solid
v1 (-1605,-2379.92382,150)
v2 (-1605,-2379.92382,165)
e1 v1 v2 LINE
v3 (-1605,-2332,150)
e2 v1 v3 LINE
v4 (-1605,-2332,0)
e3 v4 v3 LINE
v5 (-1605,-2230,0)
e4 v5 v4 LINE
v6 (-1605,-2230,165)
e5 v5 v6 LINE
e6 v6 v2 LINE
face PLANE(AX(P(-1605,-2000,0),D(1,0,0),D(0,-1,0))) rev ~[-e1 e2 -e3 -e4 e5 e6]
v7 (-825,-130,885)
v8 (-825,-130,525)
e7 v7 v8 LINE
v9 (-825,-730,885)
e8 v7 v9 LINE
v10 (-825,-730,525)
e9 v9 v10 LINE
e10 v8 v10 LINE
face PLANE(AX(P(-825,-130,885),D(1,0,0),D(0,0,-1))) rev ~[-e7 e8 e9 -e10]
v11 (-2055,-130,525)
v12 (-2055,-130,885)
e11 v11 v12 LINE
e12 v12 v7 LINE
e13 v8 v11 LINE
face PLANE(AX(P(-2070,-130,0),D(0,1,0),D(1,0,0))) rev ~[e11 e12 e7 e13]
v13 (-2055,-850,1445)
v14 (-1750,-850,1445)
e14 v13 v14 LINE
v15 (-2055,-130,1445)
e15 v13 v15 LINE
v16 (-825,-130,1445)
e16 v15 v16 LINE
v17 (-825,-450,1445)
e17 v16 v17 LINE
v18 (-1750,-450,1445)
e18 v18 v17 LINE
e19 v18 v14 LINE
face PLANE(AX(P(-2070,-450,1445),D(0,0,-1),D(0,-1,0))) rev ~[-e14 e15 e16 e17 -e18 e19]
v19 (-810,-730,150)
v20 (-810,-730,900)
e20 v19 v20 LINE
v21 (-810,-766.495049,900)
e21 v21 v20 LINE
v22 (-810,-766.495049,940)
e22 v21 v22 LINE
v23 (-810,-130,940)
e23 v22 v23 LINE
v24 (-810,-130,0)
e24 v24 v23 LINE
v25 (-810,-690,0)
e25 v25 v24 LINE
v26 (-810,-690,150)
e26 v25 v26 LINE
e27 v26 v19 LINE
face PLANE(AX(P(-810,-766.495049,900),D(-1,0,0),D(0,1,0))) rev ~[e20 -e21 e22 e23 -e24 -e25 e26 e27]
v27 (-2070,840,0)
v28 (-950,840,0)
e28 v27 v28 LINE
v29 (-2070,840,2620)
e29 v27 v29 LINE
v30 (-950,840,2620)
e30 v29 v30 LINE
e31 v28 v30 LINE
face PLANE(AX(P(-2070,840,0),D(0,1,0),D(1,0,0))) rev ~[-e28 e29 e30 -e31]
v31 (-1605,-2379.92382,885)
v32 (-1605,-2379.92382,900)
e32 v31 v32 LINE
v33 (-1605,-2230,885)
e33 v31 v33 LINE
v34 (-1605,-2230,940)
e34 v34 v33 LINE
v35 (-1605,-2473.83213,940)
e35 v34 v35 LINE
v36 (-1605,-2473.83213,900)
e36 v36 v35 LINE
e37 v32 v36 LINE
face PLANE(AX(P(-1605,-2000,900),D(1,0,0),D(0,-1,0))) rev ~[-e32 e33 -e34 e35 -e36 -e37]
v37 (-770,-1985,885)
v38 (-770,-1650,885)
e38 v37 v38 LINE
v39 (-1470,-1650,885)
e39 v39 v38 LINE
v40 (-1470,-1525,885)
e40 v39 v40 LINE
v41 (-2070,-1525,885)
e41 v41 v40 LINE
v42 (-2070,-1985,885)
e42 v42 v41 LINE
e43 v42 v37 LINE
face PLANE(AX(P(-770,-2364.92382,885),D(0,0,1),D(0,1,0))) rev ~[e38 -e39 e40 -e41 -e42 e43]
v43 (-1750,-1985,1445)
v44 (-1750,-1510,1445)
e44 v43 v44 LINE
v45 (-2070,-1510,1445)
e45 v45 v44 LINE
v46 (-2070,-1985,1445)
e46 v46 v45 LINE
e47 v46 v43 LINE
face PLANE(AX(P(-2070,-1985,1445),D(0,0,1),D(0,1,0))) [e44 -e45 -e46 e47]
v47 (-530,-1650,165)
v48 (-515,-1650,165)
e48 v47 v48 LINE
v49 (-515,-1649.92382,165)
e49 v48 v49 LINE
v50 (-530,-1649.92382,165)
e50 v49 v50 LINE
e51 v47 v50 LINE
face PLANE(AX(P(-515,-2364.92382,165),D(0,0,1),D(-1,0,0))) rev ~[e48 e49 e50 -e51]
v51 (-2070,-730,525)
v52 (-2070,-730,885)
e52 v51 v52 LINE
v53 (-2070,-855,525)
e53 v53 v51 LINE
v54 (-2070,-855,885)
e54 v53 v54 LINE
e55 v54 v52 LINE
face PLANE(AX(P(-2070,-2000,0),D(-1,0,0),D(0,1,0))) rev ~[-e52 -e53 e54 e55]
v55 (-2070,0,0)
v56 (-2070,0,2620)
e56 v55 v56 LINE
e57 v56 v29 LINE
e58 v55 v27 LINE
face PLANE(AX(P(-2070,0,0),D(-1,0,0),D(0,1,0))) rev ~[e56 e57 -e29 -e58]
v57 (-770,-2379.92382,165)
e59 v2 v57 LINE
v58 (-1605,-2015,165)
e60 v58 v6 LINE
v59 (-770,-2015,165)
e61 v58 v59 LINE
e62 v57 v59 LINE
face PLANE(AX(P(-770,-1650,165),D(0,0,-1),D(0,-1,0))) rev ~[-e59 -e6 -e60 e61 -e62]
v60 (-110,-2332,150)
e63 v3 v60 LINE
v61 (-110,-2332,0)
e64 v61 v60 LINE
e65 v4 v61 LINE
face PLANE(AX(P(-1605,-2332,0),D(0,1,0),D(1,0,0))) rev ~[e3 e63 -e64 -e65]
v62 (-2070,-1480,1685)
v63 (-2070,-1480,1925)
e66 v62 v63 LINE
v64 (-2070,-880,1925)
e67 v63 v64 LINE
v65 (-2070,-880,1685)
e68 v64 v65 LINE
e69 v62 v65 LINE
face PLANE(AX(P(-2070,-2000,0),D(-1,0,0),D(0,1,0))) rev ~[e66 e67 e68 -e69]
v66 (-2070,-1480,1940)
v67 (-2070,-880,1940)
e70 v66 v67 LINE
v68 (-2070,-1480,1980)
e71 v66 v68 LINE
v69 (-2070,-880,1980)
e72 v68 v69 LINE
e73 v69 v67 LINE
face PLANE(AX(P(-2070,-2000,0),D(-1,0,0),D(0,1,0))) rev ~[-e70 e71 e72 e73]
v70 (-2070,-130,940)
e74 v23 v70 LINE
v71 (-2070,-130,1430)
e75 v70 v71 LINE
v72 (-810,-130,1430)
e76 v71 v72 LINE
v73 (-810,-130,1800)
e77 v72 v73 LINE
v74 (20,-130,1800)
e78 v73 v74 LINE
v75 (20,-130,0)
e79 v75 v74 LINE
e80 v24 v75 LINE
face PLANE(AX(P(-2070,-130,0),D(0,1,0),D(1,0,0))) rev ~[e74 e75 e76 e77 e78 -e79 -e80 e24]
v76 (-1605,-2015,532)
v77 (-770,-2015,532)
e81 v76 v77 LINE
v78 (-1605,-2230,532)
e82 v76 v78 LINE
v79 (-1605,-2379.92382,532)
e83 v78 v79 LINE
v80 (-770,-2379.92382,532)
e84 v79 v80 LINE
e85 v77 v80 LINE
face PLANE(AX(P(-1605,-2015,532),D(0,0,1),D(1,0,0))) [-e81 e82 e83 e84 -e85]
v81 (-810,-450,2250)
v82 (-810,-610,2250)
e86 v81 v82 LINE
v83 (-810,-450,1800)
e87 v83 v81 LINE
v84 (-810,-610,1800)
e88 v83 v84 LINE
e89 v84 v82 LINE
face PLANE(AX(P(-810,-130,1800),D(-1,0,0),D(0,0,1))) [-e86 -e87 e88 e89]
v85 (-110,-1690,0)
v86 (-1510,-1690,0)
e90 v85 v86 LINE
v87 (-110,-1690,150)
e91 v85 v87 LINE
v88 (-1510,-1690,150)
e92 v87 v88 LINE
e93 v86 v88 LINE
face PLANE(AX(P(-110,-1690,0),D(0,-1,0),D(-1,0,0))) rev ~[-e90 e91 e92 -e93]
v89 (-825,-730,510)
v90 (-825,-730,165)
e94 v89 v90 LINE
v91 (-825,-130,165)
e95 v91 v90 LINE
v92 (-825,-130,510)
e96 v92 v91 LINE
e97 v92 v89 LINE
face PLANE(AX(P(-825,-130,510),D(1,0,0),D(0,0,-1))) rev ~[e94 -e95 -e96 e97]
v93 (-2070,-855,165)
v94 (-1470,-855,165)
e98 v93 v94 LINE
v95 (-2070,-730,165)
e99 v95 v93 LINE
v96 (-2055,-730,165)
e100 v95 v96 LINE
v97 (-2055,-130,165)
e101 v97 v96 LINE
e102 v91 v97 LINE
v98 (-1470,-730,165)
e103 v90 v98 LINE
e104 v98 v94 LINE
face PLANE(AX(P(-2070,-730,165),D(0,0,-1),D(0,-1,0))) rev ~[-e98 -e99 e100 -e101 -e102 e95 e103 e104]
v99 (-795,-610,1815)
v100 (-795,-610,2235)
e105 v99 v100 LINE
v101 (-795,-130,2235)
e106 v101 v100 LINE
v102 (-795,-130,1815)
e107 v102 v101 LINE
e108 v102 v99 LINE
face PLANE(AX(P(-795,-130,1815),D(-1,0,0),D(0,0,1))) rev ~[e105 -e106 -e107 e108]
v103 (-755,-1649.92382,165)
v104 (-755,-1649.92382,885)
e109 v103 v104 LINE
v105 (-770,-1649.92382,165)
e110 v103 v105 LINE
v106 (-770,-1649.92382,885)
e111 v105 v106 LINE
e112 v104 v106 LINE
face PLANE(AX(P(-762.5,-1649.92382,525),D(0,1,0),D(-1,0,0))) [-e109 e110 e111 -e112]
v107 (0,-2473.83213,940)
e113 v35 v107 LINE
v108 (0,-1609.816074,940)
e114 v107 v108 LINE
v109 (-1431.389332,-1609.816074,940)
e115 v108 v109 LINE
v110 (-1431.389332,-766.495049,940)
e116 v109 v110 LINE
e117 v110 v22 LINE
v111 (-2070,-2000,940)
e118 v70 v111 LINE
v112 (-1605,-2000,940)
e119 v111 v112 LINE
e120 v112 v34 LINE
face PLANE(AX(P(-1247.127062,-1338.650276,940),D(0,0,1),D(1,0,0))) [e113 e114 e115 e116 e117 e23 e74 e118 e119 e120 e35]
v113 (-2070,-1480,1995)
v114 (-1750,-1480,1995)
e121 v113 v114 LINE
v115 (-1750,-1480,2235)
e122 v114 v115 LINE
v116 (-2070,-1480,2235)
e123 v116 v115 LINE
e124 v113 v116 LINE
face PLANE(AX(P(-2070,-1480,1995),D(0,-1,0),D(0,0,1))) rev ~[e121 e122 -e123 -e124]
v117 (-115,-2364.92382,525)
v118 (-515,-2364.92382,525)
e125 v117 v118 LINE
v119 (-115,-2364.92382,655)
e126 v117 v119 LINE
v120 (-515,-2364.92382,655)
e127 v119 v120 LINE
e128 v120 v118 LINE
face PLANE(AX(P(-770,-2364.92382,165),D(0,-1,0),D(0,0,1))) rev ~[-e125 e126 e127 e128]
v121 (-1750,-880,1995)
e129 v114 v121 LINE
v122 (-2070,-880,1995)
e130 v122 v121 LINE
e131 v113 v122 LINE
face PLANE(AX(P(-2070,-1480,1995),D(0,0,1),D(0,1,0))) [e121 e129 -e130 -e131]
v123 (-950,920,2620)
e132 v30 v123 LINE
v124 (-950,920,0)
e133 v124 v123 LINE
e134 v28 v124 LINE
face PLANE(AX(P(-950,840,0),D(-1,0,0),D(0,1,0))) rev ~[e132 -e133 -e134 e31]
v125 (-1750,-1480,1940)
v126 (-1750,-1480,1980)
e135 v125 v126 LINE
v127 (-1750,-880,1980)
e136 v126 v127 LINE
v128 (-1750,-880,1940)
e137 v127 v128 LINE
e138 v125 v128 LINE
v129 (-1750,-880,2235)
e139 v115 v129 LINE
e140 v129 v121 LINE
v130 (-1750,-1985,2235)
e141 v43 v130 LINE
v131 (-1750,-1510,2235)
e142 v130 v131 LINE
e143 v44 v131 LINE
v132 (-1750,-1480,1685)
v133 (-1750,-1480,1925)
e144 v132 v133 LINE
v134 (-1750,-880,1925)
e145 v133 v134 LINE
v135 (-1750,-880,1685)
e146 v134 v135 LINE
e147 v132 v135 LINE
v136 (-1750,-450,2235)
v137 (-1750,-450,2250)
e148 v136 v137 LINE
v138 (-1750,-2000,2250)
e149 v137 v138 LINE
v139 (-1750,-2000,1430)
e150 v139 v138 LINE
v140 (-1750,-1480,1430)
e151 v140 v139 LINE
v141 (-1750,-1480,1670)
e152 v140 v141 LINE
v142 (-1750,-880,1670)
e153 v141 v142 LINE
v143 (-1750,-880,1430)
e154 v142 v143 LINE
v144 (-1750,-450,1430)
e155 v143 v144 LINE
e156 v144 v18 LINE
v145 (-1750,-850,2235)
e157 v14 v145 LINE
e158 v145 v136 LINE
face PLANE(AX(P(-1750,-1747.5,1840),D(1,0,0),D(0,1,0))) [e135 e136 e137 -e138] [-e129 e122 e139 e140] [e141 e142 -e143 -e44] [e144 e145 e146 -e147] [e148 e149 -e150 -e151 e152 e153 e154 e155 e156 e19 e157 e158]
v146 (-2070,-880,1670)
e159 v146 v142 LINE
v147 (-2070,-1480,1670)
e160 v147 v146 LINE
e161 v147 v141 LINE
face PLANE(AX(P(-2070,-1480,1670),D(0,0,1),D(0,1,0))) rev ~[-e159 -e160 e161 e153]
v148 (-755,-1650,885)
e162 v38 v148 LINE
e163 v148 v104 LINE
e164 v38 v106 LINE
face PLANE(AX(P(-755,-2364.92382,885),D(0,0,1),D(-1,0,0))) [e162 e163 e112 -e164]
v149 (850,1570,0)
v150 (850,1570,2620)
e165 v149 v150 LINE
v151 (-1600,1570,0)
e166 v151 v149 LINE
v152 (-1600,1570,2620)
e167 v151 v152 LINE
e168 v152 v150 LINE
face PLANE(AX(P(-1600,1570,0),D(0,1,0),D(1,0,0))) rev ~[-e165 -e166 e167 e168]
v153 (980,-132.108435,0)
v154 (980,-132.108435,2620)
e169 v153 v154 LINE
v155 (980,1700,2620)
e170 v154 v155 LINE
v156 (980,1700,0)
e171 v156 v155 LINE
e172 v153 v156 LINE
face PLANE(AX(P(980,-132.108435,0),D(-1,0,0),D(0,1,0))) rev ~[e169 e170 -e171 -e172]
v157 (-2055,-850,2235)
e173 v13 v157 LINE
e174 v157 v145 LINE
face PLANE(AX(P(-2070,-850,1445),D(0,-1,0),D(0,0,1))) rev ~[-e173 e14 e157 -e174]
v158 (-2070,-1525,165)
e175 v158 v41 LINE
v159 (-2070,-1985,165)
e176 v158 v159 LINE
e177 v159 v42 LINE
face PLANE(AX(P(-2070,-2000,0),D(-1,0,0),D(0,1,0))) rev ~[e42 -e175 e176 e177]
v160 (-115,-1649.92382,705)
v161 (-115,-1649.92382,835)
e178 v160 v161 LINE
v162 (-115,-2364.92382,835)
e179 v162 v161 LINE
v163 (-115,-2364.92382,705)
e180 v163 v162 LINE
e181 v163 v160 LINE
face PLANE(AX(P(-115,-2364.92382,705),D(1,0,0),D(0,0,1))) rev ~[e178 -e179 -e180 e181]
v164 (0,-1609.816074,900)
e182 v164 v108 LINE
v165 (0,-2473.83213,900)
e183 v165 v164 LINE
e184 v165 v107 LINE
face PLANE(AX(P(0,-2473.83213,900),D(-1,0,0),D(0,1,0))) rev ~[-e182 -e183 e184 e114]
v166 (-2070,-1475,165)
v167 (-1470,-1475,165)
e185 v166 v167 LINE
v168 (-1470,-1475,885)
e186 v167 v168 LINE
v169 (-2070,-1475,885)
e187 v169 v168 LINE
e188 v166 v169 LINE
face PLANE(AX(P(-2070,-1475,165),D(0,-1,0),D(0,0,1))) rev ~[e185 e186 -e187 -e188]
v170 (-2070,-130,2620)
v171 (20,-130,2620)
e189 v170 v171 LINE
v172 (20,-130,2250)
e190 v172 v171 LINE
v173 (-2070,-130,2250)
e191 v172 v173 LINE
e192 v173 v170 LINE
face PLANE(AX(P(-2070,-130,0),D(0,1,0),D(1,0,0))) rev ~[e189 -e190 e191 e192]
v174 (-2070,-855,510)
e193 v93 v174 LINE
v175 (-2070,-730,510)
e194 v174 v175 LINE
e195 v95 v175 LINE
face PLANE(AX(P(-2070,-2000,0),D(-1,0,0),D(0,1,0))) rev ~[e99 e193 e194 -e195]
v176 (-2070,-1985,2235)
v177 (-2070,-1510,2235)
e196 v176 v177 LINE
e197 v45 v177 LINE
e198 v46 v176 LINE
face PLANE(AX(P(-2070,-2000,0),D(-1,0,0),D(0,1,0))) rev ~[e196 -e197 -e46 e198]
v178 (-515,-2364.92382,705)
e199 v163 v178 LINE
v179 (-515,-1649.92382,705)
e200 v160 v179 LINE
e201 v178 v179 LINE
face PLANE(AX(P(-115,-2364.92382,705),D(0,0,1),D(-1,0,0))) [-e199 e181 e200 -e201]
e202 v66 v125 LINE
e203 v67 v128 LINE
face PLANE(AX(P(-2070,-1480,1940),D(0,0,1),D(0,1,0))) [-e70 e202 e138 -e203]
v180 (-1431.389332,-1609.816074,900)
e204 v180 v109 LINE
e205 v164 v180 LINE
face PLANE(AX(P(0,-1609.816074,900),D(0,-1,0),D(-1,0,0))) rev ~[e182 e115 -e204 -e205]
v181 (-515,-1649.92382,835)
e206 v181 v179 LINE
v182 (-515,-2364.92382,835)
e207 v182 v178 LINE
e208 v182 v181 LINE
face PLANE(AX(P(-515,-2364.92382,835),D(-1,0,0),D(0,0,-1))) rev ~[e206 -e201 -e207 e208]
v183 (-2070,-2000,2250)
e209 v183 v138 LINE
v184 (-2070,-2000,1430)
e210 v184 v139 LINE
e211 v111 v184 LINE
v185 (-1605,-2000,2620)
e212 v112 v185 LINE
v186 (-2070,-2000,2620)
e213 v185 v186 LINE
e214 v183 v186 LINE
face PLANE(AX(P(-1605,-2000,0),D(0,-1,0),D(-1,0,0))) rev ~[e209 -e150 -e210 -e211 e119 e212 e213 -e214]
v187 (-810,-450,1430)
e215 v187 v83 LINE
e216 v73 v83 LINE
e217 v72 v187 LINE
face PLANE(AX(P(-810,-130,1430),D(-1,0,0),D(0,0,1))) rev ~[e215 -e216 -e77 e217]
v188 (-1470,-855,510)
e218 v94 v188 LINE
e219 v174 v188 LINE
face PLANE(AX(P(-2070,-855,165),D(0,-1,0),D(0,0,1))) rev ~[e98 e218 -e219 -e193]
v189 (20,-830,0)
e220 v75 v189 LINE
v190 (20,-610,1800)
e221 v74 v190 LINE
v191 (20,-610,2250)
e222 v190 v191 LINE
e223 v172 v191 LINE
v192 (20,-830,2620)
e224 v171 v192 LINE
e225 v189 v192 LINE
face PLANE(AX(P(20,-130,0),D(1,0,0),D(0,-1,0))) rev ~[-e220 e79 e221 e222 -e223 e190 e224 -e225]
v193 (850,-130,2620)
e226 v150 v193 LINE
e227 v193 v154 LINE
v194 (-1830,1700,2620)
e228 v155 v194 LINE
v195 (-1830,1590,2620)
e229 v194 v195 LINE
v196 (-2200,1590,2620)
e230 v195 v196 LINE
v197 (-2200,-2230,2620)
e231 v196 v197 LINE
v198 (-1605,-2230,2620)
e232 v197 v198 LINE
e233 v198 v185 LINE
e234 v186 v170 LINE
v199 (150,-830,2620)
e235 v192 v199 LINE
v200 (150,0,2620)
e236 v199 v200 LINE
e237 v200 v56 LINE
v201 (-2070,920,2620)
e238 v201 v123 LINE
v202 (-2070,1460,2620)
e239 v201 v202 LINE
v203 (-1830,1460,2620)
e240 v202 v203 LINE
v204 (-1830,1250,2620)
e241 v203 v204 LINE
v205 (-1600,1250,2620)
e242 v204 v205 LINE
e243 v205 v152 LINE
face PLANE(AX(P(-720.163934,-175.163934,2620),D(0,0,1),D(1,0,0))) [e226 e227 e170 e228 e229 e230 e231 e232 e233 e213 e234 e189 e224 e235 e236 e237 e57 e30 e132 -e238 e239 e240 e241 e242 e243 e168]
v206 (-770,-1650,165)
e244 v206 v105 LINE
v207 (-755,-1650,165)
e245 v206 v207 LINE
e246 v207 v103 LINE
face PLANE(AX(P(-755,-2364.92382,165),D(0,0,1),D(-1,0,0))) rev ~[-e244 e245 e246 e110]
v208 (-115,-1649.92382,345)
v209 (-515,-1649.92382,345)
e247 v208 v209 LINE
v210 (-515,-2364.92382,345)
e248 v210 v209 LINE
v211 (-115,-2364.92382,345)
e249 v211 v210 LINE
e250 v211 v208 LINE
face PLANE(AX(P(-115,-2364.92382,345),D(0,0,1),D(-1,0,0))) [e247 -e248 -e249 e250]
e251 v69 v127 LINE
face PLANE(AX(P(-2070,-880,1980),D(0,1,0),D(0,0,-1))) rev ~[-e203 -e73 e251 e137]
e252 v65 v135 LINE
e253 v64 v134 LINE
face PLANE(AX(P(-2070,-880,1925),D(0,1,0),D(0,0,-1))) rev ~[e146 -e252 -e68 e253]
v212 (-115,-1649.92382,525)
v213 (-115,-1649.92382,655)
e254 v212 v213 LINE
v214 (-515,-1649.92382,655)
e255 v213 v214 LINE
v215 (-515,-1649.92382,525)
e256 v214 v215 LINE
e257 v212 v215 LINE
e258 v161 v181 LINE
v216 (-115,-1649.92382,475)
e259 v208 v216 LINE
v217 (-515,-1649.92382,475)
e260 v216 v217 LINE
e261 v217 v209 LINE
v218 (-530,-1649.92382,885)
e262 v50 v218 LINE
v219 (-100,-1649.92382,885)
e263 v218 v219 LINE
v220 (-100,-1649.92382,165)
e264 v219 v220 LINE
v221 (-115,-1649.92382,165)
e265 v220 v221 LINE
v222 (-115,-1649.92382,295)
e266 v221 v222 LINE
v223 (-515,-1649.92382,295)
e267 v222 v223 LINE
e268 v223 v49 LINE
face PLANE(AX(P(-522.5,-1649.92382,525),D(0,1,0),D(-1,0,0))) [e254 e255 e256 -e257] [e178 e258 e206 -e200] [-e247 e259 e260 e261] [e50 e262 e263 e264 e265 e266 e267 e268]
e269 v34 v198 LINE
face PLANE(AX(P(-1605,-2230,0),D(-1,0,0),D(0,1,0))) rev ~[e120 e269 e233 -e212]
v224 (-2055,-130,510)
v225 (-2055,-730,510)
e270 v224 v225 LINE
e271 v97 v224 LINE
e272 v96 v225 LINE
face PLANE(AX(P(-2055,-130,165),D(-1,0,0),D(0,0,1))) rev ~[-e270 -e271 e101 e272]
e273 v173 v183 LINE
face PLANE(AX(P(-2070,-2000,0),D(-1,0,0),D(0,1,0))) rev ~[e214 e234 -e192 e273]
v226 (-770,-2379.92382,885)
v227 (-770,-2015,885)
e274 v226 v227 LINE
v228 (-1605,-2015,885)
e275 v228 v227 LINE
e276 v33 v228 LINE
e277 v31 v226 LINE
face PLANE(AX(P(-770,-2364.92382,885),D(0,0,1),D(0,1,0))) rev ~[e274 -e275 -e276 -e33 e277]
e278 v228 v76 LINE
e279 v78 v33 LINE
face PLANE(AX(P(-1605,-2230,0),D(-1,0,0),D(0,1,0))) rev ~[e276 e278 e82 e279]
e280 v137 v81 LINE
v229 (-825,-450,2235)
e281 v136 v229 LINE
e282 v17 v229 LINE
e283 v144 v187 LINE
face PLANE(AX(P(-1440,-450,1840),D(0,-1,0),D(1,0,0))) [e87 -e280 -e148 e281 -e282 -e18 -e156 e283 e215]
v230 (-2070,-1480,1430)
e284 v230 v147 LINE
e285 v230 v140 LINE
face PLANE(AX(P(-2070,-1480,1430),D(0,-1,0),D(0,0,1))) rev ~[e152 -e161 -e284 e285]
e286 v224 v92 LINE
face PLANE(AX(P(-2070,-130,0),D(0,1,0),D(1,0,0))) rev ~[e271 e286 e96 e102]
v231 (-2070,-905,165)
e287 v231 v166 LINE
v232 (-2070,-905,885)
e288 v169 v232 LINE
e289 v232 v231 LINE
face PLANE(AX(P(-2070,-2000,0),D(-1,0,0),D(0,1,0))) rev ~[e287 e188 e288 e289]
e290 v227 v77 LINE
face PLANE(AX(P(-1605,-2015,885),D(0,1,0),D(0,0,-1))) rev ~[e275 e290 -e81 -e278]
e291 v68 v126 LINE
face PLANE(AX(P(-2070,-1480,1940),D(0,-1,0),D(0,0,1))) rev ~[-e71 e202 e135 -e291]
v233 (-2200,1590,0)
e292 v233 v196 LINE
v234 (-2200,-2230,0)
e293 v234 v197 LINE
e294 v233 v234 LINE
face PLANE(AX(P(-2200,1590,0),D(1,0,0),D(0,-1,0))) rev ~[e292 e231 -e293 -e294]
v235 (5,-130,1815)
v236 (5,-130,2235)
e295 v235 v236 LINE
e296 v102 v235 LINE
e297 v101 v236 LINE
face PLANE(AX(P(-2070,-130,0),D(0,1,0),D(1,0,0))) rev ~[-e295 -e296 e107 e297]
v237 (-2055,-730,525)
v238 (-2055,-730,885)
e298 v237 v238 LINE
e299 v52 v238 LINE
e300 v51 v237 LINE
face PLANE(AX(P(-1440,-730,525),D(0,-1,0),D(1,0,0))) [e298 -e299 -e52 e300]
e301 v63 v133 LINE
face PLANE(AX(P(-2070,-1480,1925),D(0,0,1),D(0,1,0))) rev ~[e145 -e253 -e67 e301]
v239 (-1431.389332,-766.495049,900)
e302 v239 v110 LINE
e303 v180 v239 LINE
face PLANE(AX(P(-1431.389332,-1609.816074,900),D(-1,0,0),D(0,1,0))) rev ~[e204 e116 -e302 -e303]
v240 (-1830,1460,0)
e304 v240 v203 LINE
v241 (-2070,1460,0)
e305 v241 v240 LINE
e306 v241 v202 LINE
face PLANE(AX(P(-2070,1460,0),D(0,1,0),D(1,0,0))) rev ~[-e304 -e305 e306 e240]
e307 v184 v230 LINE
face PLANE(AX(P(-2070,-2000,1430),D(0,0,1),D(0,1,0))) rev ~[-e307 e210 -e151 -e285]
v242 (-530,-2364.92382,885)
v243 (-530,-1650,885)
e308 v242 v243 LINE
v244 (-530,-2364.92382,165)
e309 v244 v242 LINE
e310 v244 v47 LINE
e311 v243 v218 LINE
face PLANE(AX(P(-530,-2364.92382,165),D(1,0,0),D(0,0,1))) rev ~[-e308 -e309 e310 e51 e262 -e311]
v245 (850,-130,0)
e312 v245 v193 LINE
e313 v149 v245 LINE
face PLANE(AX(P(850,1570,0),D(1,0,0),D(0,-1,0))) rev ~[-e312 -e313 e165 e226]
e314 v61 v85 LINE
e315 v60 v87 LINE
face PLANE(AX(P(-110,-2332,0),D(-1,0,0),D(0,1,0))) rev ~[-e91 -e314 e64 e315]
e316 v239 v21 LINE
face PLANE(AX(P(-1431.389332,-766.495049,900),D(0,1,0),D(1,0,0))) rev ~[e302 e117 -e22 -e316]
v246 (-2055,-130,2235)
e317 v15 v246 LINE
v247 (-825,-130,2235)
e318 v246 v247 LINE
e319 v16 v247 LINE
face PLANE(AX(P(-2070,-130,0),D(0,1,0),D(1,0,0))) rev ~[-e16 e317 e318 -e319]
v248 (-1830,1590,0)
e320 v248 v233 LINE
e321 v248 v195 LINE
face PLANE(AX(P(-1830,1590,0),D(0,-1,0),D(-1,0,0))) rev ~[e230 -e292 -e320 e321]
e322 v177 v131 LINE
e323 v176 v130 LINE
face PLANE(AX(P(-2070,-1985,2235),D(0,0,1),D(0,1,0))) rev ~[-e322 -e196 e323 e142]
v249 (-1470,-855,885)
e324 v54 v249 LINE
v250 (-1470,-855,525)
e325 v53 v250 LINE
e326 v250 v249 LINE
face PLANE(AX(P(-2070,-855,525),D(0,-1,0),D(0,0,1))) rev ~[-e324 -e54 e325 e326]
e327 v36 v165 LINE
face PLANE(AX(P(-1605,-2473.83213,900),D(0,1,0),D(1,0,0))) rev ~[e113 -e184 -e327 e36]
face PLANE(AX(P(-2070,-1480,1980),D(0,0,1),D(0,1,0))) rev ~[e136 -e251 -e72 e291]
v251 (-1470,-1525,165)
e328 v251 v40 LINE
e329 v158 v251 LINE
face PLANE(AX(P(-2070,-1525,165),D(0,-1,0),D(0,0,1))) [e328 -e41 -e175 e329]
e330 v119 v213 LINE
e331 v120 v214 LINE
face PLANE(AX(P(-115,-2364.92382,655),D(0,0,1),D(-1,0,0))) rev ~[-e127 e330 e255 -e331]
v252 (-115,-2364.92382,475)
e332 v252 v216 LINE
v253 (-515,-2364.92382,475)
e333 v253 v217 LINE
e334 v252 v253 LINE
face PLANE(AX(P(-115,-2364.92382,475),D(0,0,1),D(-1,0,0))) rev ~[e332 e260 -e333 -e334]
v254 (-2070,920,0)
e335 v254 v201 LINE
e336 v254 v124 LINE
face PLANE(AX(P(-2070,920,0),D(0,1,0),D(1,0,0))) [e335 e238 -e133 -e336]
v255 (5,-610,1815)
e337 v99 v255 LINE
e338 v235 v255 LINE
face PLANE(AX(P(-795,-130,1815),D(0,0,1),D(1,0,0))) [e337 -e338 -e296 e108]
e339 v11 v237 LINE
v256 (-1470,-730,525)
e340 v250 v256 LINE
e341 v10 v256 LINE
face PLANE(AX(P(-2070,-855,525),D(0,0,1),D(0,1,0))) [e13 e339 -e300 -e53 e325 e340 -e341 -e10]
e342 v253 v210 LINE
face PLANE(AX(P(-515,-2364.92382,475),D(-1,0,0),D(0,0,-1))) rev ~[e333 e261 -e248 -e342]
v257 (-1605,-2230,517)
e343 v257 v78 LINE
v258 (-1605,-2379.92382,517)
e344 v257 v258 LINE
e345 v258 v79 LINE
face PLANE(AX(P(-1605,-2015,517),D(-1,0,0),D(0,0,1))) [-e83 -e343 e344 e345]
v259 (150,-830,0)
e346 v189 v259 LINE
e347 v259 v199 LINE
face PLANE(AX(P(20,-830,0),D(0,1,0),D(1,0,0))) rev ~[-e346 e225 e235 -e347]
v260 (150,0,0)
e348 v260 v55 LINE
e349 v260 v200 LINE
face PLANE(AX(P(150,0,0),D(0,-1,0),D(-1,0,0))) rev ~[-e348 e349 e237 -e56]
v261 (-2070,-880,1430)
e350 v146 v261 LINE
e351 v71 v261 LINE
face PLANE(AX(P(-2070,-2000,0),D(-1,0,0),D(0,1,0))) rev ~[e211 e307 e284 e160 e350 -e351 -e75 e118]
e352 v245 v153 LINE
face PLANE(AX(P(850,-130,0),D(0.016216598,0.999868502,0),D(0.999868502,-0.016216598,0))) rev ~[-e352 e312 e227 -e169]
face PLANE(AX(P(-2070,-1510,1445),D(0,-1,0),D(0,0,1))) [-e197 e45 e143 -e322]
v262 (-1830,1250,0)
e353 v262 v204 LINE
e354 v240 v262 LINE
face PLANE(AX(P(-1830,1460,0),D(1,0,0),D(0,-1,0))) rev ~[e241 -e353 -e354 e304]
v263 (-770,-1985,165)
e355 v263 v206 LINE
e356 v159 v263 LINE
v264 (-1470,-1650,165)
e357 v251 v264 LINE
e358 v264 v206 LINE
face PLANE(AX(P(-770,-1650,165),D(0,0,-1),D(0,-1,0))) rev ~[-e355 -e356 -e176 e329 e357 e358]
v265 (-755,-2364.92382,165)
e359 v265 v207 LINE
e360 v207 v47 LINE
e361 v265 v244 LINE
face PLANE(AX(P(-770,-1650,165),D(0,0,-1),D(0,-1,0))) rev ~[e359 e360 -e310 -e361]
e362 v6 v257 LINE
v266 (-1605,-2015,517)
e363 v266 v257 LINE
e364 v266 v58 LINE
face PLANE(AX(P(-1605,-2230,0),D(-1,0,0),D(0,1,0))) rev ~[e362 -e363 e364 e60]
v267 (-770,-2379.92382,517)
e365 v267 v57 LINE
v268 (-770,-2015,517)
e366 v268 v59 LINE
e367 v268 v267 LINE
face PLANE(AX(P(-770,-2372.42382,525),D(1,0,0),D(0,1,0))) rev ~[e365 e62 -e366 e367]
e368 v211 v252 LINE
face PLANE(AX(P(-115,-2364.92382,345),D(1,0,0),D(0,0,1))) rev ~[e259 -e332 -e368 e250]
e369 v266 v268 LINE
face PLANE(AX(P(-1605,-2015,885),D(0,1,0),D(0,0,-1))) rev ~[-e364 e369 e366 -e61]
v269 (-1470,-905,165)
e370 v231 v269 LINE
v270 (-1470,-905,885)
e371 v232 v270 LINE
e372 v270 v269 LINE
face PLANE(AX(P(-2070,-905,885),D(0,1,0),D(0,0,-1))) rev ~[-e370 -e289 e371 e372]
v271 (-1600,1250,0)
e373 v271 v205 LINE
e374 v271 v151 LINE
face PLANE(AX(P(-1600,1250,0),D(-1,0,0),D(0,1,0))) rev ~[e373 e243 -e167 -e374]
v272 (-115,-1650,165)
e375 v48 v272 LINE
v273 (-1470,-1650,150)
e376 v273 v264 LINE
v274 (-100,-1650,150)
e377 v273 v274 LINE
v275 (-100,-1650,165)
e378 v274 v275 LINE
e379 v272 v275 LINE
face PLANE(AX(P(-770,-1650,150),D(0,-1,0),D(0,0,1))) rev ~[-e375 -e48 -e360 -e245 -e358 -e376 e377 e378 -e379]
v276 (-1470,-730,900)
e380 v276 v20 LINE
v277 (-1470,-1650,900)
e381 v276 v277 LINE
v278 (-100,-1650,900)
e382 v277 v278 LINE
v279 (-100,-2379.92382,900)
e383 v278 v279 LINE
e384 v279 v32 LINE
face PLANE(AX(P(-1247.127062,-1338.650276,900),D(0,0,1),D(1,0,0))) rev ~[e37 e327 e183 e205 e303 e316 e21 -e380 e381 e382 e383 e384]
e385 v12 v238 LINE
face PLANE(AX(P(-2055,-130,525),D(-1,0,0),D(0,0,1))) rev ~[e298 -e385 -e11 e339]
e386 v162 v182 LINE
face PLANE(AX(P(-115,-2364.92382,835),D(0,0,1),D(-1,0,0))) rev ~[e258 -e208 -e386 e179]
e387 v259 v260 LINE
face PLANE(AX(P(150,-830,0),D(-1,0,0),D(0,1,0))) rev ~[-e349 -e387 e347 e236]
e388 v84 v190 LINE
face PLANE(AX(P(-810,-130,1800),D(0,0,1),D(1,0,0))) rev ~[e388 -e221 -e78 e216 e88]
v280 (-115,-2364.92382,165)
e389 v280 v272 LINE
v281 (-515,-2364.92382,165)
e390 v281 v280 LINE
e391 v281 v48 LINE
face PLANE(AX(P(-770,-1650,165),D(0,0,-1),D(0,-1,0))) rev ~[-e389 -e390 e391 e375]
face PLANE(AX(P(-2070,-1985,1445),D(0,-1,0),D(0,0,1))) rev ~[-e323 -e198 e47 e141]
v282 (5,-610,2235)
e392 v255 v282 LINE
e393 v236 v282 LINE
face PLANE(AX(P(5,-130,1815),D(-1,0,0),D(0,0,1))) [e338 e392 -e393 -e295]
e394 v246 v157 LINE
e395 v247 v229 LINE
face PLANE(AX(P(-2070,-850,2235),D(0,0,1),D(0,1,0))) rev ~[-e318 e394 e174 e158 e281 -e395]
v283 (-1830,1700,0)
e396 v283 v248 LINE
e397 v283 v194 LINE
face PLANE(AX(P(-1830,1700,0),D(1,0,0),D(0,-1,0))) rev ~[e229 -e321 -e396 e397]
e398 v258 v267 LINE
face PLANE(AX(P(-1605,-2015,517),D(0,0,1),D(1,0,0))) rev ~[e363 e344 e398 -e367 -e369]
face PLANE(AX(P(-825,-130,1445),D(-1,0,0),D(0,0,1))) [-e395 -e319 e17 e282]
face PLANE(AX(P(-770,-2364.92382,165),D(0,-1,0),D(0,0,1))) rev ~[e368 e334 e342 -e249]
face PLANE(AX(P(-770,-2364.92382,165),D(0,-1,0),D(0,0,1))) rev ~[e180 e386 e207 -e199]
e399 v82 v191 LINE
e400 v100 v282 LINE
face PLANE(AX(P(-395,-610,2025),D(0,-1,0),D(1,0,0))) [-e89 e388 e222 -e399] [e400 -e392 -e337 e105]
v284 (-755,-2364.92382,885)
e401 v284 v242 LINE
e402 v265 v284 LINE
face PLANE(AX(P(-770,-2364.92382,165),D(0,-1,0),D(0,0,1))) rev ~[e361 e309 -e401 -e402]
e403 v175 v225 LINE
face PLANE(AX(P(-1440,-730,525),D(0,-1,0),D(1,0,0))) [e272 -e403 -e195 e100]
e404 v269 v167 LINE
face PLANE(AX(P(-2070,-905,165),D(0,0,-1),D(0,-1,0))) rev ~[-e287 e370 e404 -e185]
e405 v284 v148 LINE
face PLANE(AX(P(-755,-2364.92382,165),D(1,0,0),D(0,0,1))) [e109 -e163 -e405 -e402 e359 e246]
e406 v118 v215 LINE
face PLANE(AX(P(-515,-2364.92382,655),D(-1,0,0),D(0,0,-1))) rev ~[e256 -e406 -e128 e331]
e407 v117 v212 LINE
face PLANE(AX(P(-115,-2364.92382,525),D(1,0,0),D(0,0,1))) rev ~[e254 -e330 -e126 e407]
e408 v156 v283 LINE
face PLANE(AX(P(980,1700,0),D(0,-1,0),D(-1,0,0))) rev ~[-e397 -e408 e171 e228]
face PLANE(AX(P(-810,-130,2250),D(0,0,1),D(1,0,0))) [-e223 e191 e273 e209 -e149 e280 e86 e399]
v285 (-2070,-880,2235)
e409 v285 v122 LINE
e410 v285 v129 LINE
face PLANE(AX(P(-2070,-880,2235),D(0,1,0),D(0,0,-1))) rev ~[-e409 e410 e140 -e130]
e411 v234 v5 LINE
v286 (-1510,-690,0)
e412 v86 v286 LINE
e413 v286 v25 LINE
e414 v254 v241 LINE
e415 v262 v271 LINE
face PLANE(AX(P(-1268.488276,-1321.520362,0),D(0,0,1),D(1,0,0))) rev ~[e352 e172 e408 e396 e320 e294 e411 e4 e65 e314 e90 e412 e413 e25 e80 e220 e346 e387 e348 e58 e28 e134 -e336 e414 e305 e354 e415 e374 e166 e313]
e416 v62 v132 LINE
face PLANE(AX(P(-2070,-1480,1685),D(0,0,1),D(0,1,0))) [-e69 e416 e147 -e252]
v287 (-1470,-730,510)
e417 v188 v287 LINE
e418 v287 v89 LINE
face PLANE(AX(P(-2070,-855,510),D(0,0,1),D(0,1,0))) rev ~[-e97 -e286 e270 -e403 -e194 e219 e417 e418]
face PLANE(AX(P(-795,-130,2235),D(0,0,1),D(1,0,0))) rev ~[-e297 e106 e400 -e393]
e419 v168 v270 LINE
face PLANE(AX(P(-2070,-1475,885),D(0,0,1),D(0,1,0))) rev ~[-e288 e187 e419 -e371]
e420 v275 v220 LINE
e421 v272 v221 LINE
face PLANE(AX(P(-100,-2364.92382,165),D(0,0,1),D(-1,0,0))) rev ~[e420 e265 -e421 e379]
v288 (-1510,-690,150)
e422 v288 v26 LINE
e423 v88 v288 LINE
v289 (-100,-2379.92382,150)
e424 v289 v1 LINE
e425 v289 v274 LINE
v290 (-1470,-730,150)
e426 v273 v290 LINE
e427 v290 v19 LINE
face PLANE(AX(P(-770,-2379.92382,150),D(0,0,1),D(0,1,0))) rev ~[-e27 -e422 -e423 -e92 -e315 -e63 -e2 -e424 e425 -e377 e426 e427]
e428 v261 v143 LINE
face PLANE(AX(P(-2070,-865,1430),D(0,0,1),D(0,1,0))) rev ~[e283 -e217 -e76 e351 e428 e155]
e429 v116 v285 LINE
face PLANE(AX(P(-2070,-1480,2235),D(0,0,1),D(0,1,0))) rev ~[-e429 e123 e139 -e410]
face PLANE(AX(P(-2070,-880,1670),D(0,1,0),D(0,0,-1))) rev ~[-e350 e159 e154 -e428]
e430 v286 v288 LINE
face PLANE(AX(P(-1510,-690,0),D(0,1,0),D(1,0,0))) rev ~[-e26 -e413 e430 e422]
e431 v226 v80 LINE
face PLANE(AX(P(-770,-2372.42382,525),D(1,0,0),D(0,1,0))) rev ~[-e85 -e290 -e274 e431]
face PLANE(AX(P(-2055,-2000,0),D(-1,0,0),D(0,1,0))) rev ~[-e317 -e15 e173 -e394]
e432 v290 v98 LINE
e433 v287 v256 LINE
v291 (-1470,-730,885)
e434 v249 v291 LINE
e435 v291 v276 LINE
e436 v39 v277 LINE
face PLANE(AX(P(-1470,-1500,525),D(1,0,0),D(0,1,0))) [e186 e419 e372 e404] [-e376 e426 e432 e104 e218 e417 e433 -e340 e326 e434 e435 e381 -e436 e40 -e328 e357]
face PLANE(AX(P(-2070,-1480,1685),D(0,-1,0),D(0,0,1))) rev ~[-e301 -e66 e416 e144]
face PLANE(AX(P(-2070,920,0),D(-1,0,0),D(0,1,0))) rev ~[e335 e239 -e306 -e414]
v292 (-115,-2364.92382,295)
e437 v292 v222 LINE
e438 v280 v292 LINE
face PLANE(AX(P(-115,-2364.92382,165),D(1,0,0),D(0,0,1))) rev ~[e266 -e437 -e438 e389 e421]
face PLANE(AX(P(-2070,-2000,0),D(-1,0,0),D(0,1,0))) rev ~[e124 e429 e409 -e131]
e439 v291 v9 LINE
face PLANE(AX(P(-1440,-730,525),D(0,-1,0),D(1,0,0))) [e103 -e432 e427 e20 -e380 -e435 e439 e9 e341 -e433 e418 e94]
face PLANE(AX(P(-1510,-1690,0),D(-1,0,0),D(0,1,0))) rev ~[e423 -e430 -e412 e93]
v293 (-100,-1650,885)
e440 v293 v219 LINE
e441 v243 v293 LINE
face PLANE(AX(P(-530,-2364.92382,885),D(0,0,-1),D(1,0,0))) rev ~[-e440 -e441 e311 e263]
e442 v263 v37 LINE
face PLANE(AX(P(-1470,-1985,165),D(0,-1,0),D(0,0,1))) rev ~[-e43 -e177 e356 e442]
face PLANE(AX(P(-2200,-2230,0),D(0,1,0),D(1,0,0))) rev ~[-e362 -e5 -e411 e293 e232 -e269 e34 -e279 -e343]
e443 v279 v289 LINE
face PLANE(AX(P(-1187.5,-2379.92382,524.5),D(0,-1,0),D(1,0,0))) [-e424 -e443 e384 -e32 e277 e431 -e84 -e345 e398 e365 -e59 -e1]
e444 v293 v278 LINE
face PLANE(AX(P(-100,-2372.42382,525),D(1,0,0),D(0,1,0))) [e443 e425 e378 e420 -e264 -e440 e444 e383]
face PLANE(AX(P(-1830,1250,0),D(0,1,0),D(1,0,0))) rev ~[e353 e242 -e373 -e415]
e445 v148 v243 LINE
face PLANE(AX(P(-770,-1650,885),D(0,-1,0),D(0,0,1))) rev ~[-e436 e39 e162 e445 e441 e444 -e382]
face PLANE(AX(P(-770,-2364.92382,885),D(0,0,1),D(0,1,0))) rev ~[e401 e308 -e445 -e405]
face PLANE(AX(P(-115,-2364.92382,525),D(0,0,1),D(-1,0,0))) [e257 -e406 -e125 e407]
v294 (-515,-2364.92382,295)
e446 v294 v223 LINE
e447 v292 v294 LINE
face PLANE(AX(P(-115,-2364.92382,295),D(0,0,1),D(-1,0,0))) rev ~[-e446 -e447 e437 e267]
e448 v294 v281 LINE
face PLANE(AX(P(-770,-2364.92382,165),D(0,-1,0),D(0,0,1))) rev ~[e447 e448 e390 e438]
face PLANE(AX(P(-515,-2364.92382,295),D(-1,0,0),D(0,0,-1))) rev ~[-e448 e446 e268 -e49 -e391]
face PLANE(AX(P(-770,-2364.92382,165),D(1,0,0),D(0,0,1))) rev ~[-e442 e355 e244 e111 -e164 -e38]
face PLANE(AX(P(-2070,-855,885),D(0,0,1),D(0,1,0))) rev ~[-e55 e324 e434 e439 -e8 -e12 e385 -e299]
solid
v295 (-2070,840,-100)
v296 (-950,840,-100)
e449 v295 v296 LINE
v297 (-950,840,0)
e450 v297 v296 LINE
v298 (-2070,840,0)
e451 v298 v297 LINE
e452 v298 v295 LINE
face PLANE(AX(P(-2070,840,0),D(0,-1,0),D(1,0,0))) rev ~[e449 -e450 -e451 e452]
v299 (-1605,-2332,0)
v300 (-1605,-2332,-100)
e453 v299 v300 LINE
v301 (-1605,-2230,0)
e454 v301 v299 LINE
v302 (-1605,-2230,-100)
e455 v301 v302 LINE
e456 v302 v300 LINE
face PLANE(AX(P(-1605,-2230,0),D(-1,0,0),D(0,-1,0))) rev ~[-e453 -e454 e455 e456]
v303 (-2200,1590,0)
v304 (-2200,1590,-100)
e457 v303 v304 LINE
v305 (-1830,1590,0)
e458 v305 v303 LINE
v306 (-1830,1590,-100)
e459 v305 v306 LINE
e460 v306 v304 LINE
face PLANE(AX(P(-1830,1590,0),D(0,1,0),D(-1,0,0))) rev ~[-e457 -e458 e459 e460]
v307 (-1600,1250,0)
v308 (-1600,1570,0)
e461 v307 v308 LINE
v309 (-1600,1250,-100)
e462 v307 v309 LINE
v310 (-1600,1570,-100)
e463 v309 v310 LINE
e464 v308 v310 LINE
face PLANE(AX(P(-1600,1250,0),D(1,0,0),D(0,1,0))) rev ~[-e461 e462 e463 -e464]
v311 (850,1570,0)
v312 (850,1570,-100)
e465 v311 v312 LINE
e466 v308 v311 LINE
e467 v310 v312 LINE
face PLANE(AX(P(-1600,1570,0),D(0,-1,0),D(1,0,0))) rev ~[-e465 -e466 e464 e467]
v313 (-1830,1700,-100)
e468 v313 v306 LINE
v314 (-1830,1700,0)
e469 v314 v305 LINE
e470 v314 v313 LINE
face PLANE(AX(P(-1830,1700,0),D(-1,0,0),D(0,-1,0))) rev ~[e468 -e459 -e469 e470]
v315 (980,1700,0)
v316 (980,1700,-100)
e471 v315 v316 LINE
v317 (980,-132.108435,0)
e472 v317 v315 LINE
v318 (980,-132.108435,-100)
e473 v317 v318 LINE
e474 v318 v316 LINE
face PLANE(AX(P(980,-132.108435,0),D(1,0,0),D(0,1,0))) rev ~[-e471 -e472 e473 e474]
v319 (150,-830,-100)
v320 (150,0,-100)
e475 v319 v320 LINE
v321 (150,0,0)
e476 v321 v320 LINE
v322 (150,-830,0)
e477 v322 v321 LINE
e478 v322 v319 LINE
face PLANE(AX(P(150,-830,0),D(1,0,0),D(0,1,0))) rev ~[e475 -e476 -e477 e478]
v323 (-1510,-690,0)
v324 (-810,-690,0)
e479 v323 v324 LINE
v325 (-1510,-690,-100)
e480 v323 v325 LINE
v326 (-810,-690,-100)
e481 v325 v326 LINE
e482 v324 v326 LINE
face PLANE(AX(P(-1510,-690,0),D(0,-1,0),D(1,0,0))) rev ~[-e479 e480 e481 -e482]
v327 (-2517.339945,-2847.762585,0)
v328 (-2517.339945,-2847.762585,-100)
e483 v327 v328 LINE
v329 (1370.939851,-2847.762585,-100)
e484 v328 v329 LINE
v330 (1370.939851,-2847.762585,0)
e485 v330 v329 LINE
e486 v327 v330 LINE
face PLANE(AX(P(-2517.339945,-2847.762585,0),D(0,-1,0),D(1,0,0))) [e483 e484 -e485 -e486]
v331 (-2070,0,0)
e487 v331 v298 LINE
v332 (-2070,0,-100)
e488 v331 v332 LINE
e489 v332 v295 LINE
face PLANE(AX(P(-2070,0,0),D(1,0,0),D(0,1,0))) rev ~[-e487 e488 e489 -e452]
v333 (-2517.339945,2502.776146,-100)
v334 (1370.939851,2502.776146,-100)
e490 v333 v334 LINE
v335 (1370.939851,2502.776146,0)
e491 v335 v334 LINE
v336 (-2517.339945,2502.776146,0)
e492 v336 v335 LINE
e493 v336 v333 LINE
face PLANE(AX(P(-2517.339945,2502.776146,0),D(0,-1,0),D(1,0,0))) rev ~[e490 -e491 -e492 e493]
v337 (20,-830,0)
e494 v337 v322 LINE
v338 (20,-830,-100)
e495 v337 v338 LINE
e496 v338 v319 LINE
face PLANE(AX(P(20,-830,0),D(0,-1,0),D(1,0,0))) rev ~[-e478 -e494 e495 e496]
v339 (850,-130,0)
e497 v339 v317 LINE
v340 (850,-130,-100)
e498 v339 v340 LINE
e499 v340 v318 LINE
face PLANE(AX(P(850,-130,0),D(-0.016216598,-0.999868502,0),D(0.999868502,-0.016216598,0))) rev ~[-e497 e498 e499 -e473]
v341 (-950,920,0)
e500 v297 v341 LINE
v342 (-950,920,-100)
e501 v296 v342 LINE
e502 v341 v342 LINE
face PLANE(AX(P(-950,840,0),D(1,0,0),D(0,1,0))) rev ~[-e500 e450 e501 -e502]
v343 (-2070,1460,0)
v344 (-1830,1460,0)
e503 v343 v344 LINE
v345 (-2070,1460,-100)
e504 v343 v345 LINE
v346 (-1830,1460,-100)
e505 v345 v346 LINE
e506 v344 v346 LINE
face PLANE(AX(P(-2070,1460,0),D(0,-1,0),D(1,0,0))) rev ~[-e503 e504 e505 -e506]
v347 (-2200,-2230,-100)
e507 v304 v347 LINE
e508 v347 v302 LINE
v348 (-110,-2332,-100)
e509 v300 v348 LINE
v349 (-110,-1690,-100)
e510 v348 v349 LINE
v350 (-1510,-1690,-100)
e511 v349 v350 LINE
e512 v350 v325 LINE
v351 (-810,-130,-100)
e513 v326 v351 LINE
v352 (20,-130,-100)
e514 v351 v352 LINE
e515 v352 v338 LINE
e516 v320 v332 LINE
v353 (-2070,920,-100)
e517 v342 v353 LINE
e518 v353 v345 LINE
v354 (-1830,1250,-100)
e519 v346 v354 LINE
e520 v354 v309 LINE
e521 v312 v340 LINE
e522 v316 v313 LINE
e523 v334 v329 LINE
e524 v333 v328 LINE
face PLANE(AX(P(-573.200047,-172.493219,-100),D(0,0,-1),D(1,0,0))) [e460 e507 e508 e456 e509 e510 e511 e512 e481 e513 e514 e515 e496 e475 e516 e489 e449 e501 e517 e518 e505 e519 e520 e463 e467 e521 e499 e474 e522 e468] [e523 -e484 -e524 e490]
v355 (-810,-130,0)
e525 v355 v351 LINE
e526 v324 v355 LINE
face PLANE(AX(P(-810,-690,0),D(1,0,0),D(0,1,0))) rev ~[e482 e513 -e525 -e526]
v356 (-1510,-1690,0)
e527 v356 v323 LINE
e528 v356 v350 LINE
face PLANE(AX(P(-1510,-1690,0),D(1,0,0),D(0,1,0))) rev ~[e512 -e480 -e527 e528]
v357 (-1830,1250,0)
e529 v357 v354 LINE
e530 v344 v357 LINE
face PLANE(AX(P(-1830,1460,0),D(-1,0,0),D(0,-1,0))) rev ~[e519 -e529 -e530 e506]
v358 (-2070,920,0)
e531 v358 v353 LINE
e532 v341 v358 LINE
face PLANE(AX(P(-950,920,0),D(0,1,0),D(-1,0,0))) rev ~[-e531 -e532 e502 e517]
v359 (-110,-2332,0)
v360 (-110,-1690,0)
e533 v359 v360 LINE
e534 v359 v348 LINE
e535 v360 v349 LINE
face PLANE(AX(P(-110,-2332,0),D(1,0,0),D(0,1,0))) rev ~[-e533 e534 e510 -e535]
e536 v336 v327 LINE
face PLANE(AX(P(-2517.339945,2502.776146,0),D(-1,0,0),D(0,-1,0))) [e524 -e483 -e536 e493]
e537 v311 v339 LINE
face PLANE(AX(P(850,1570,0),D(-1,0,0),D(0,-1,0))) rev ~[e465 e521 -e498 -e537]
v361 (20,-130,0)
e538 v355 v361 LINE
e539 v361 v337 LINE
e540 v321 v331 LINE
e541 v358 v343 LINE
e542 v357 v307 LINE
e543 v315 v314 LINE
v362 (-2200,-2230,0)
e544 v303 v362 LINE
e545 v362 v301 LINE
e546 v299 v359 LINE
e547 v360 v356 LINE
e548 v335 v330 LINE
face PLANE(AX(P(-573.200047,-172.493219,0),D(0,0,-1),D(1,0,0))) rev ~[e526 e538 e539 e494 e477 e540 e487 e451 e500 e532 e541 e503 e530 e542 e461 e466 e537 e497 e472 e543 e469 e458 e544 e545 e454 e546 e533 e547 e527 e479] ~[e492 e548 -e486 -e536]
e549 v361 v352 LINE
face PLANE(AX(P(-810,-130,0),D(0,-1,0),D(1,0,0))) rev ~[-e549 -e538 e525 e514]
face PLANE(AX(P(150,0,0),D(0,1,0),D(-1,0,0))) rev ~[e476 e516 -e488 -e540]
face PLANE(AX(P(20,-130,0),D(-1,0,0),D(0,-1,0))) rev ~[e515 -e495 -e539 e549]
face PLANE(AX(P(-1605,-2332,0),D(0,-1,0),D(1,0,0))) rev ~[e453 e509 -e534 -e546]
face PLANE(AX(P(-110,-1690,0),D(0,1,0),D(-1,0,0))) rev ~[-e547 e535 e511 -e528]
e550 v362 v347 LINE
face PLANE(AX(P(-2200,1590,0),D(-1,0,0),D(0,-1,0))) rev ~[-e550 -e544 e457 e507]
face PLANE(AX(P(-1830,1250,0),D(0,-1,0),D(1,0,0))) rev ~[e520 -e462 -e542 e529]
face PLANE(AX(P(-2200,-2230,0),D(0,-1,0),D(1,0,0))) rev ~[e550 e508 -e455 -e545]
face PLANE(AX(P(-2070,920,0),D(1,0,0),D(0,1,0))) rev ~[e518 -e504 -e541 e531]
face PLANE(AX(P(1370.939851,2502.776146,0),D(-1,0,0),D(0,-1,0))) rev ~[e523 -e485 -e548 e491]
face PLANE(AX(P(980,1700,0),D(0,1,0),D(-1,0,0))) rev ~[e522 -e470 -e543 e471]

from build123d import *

# Parameters (mm, degrees)
F0_W      = 1120
F0_H      = 80
F1_DEPTH  = 2620
F2_W      = 1260
F2_H      = 820
F2_W_2    = 1230
F2_H_2    = 790
F3_DEPTH  = 320
F5_DEPTH  = 320
F6_DEPTH  = 15
F7_W      = 600
F7_H      = 15
F8_DEPTH  = 320
F9_W      = 505
F9_H      = 820
F9_W_2    = 475
F9_H_2    = 790
F10_DEPTH = 320
F11_DEPTH = 150
F12_W     = 1260
F12_H     = 750
F12_W_2   = 779.1761636734
F12_H_2   = 15
F12_W_3   = 450.8238363266
F13_DEPTH = 600
F14_W     = 50
F14_H     = 720
F14_W_2   = 125
F14_H_2   = 15
F15_DEPTH = 600
F16_W     = 830
F16_H     = 450
F16_W_2   = 800
F16_H_2   = 420
F17_DEPTH = 480
F18_W     = 3888.2797956467
F18_H     = 5350.5387306213
F19_DEPTH = 100
F21_DEPTH = 700
F22_W     = 149.9238204956
F22_H     = 15
F23_DEPTH = 835
F24_W     = 15
F24_H     = 720
F25_DEPTH = 670
F26_W     = 400
F26_H     = 50
F26_W_2   = 15
F26_H_2   = 720
F27_DEPTH = 715
F29_DEPTH = 40
F30_W     = 835
F30_H     = 15
F31_DEPTH = 364.9238204956


# Not quite as in the source:
# - a feature names something its author has since deleted; it is built from what else it names


with BuildPart() as f1:
    # F0 (on Top) → F1 (new body)
    with BuildSketch(Plane.XY):
        Polygon((-2070, 0), (-2070, -130), (-810, -130), (20, -130), (20, -830), (150, -830), (150, 0), align=None)
        Polygon((-1830, 1460), (-1830, 1590), (-2200, 1590), (-2200, -2000), (-2070, -2000), (-2070, -130), (-2070, 0), (-2070, 840), (-2070, 920), (-2070, 1460), align=None)
        Polygon((980, 1700), (-1600, 1700), (-1600, 1570), (850, 1570), (850, -130), (980, -132.1084350348), align=None)
        Polygon((-1600, 1570), (-1600, 1700), (-1830, 1700), (-1830, 1590), (-1830, 1460), (-1830, 1250), (-1600, 1250), align=None)
        Polygon((-2070, -2000), (-2200, -2000), (-2200, -2230), (-1605, -2230), (-1605, -2000), align=None)
        with Locations((-1510, 880)):
            Rectangle(F0_W, F0_H)
    extrude(amount=F1_DEPTH)

    # F2 (on face) → F3 (join)
    with BuildSketch(Plane.XZ.offset(130)):
        with Locations((-1440, 1840)):
            Rectangle(F2_W, F2_H)
        with Locations((-1440, 1840)):
            Rectangle(F2_W_2, F2_H_2, mode=Mode.SUBTRACT)
    extrude(amount=F3_DEPTH)

    # F4 (on face) → F5 (join)
    with BuildSketch(Plane.YZ.offset(-2070)):
        Polygon((-450, 2235), (-450, 2250), (-865, 2250), (-865, 1430), (-450, 1430), (-450, 1445), (-630, 1445), (-645, 1445), (-850, 1445), (-850, 2235), (-645, 2235), (-630, 2235), align=None)
    extrude(amount=F5_DEPTH)

    # F6 (add): a face of the model
    f6_faces = [f1.faces().sort_by_distance(p)[0] for p in [
        (-2070, -650, 1840),
    ]]
    extrude(f6_faces, amount=F6_DEPTH)

    # F7 (on face) → F8 (join)
    with BuildSketch(Plane.YZ.offset(-2070)):
        Polygon((-865, 1430), (-865, 2250), (-1495, 2250), (-1495, 1430), (-1480, 1430), (-1480, 1670), (-1480, 1685), (-1480, 1925), (-1480, 1940), (-1480, 1980), (-1480, 1995), (-1480, 2235), (-880, 2235), (-880, 1995), (-880, 1980), (-880, 1940), (-880, 1925), (-880, 1685), (-880, 1670), (-880, 1430), align=None)
        with Locations((-1180, 1987.5)):
            Rectangle(F7_W, F7_H)
        with Locations((-1180, 1932.5)):
            Rectangle(F7_W, F7_H)
        with Locations((-1180, 1677.5)):
            Rectangle(F7_W, F7_H)
    extrude(amount=F8_DEPTH)

    # F9 (on face) → F10 (join)
    with BuildSketch(Plane.YZ.offset(-2070)):
        with Locations((-1747.5, 1840)):
            Rectangle(F9_W, F9_H)
        with Locations((-1747.5, 1840)):
            Rectangle(F9_W_2, F9_H_2, mode=Mode.SUBTRACT)
    extrude(amount=F10_DEPTH)

    # F0 (on Top) → F11 (join)
    with BuildSketch(Plane.XY):
        Polygon((-2070, -130), (-2070, -2000), (-1605, -2000), (-1605, -2230), (-1605, -2332), (-110, -2332), (-110, -1690), (-1510, -1690), (-1510, -690), (-810, -690), (-810, -130), align=None)
    extrude(amount=F11_DEPTH)

    # F12 (on face) → F13 (join)
    with BuildSketch(Plane.XZ.offset(130)):
        with Locations((-1440, 525)):
            Rectangle(F12_W, F12_H)
        Polygon((-825, 510), (-825, 165), (-2055, 165), (-2055, 510), (-2055, 525), (-2055, 885), (-825, 885), (-825, 525), align=None, mode=Mode.SUBTRACT)
        with Locations((-1214.5880818367, 517.5)):
            Rectangle(F12_W_2, F12_H_2)
        with Locations((-1829.5880818367, 517.5)):
            Rectangle(F12_W_3, F12_H_2)
    extrude(amount=F13_DEPTH)

    # F14 (on face) → F15 (join)
    with BuildSketch(Plane.YZ.offset(-2070)):
        with Locations((-1500, 525)):
            Rectangle(F14_W, F14_H)
        Polygon((-905, 885), (-905, 165), (-855, 165), (-855, 510), (-855, 525), (-855, 885), align=None)
        with Locations((-792.5, 517.5)):
            Rectangle(F14_W_2, F14_H_2)
        Polygon((-1475, 165), (-1525, 165), (-1985, 165), (-1985, 885), (-1525, 885), (-1475, 885), (-905, 885), (-855, 885), (-730, 885), (-730, 900), (-2000, 900), (-2000, 150), (-730, 150), (-730, 165), (-855, 165), (-905, 165), align=None)
    extrude(amount=F15_DEPTH)

    # F16 (on face) → F17 (join)
    with BuildSketch(Plane.XZ.offset(130)):
        with Locations((-395, 2025)):
            Rectangle(F16_W, F16_H)
        with Locations((-395, 2025)):
            Rectangle(F16_W_2, F16_H_2, mode=Mode.SUBTRACT)
    extrude(amount=F17_DEPTH)

    # F20 (on face) → F21 (join)
    with BuildSketch(Plane.YZ.offset(-1470)):
        Polygon((-1690, 150), (-1650, 150), (-1650, 165), (-1985, 165), (-1985, 885), (-1650, 885), (-1650, 900), (-2000, 900), (-2000, 150), align=None)
    extrude(amount=F21_DEPTH)

    # F22 (on face) → F23 (join)
    with BuildSketch(Plane.YZ.offset(-1605)):
        Polygon((-2230, 165), (-2230, 150), (-2000, 150), (-2000, 900), (-2230, 900), (-2230, 885), (-2015, 885), (-2015, 165), align=None)
        with Locations((-2304.9619102478, 892.5)):
            Rectangle(F22_W, F22_H)
        with Locations((-2304.9619102478, 157.5)):
            Rectangle(F22_W, F22_H)
    extrude(amount=F23_DEPTH)

    # F24 (on face) → F25 (join)
    with BuildSketch(Plane.YZ.offset(-770)):
        with Locations((-2372.4238204956, 525)):
            Rectangle(F24_W, F24_H)
        Polygon((-1690, 150), (-1650, 150), (-1650, 165), (-1985, 165), (-2015, 165), (-2364.9238204956, 165), (-2379.9238204956, 165), (-2379.9238204956, 150), (-2332, 150), align=None)
        Polygon((-2015, 885), (-1985, 885), (-1650, 885), (-1650, 900), (-2379.9238204956, 900), (-2379.9238204956, 885), (-2364.9238204956, 885), align=None)
    extrude(amount=F25_DEPTH)

    # F26 (on face) → F27 (join)
    with BuildSketch(Plane(origin=(0, -2364.9238204956, 0), x_dir=(-1, 0, 0), z_dir=(0, 1, 0))):
        Polygon((515, 295), (515, 165), (530, 165), (530, 885), (515, 885), (515, 835), (515, 705), (515, 655), (515, 525), (515, 475), (515, 345), align=None)
        with Locations((315, 860)):
            Rectangle(F26_W, F26_H)
        with Locations((315, 680)):
            Rectangle(F26_W, F26_H)
        with Locations((315, 500)):
            Rectangle(F26_W, F26_H)
        with Locations((762.5, 525)):
            Rectangle(F26_W_2, F26_H_2)
        with Locations((315, 320)):
            Rectangle(F26_W, F26_H)
        Polygon((100, 885), (100, 165), (115, 165), (115, 295), (115, 345), (115, 475), (115, 525), (115, 655), (115, 705), (115, 835), (115, 885), align=None)
    extrude(amount=F27_DEPTH)

    # F28 (on face) → F29 (join)
    with BuildSketch(Plane.XY.offset(900)):
        Polygon((-2070, -2000), (-1605, -2000), (-1605, -2230), (-1605, -2379.9238204956), (-100, -2379.9238204956), (-100, -1650), (-1470, -1650), (-1470, -730), (-810, -730), (-810, -130), (-2070, -130), align=None)
        Polygon((-100, -2379.9238204956), (-1605, -2379.9238204956), (-1605, -2473.8321304321), (0, -2473.8321304321), (0, -1609.8160743713), (-1431.3893318176, -1609.8160743713), (-1431.3893318176, -766.4950489998), (-810, -766.4950489998), (-810, -730), (-1470, -730), (-1470, -1650), (-100, -1650), align=None)
    extrude(amount=F29_DEPTH)

    # F30 (on face) → F31 (join, through all)
    with BuildSketch(Plane.XZ.offset(2015)):
        with Locations((-1187.5, 524.5)):
            Rectangle(F30_W, F30_H)
    extrude(amount=F31_DEPTH)


with BuildPart() as f19:
    # F18 (on face) → F19 (new body)
    with BuildSketch(Plane(origin=(0, 0, 0), x_dir=(1, 0, 0), z_dir=(0, 0, -1))):
        with Locations((-573.2000470161, 172.4932193756)):
            Rectangle(F18_W, F18_H)
        Polygon((-810, 130), (20, 130), (20, 830), (150, 830), (150, 0), (-2070, 0), (-2070, -840), (-950, -840), (-950, -920), (-2070, -920), (-2070, -1460), (-1830, -1460), (-1830, -1250), (-1600, -1250), (-1600, -1570), (850, -1570), (850, 130), (980, 132.1084350348), (980, -1700), (-1830, -1700), (-1830, -1590), (-2200, -1590), (-2200, 2230), (-1605, 2230), (-1605, 2332), (-110, 2332), (-110, 1690), (-1510, 1690), (-1510, 690), (-810, 690), align=None, mode=Mode.SUBTRACT)
    extrude(amount=F19_DEPTH)


solid = Compound([f1.part, f19.part])
